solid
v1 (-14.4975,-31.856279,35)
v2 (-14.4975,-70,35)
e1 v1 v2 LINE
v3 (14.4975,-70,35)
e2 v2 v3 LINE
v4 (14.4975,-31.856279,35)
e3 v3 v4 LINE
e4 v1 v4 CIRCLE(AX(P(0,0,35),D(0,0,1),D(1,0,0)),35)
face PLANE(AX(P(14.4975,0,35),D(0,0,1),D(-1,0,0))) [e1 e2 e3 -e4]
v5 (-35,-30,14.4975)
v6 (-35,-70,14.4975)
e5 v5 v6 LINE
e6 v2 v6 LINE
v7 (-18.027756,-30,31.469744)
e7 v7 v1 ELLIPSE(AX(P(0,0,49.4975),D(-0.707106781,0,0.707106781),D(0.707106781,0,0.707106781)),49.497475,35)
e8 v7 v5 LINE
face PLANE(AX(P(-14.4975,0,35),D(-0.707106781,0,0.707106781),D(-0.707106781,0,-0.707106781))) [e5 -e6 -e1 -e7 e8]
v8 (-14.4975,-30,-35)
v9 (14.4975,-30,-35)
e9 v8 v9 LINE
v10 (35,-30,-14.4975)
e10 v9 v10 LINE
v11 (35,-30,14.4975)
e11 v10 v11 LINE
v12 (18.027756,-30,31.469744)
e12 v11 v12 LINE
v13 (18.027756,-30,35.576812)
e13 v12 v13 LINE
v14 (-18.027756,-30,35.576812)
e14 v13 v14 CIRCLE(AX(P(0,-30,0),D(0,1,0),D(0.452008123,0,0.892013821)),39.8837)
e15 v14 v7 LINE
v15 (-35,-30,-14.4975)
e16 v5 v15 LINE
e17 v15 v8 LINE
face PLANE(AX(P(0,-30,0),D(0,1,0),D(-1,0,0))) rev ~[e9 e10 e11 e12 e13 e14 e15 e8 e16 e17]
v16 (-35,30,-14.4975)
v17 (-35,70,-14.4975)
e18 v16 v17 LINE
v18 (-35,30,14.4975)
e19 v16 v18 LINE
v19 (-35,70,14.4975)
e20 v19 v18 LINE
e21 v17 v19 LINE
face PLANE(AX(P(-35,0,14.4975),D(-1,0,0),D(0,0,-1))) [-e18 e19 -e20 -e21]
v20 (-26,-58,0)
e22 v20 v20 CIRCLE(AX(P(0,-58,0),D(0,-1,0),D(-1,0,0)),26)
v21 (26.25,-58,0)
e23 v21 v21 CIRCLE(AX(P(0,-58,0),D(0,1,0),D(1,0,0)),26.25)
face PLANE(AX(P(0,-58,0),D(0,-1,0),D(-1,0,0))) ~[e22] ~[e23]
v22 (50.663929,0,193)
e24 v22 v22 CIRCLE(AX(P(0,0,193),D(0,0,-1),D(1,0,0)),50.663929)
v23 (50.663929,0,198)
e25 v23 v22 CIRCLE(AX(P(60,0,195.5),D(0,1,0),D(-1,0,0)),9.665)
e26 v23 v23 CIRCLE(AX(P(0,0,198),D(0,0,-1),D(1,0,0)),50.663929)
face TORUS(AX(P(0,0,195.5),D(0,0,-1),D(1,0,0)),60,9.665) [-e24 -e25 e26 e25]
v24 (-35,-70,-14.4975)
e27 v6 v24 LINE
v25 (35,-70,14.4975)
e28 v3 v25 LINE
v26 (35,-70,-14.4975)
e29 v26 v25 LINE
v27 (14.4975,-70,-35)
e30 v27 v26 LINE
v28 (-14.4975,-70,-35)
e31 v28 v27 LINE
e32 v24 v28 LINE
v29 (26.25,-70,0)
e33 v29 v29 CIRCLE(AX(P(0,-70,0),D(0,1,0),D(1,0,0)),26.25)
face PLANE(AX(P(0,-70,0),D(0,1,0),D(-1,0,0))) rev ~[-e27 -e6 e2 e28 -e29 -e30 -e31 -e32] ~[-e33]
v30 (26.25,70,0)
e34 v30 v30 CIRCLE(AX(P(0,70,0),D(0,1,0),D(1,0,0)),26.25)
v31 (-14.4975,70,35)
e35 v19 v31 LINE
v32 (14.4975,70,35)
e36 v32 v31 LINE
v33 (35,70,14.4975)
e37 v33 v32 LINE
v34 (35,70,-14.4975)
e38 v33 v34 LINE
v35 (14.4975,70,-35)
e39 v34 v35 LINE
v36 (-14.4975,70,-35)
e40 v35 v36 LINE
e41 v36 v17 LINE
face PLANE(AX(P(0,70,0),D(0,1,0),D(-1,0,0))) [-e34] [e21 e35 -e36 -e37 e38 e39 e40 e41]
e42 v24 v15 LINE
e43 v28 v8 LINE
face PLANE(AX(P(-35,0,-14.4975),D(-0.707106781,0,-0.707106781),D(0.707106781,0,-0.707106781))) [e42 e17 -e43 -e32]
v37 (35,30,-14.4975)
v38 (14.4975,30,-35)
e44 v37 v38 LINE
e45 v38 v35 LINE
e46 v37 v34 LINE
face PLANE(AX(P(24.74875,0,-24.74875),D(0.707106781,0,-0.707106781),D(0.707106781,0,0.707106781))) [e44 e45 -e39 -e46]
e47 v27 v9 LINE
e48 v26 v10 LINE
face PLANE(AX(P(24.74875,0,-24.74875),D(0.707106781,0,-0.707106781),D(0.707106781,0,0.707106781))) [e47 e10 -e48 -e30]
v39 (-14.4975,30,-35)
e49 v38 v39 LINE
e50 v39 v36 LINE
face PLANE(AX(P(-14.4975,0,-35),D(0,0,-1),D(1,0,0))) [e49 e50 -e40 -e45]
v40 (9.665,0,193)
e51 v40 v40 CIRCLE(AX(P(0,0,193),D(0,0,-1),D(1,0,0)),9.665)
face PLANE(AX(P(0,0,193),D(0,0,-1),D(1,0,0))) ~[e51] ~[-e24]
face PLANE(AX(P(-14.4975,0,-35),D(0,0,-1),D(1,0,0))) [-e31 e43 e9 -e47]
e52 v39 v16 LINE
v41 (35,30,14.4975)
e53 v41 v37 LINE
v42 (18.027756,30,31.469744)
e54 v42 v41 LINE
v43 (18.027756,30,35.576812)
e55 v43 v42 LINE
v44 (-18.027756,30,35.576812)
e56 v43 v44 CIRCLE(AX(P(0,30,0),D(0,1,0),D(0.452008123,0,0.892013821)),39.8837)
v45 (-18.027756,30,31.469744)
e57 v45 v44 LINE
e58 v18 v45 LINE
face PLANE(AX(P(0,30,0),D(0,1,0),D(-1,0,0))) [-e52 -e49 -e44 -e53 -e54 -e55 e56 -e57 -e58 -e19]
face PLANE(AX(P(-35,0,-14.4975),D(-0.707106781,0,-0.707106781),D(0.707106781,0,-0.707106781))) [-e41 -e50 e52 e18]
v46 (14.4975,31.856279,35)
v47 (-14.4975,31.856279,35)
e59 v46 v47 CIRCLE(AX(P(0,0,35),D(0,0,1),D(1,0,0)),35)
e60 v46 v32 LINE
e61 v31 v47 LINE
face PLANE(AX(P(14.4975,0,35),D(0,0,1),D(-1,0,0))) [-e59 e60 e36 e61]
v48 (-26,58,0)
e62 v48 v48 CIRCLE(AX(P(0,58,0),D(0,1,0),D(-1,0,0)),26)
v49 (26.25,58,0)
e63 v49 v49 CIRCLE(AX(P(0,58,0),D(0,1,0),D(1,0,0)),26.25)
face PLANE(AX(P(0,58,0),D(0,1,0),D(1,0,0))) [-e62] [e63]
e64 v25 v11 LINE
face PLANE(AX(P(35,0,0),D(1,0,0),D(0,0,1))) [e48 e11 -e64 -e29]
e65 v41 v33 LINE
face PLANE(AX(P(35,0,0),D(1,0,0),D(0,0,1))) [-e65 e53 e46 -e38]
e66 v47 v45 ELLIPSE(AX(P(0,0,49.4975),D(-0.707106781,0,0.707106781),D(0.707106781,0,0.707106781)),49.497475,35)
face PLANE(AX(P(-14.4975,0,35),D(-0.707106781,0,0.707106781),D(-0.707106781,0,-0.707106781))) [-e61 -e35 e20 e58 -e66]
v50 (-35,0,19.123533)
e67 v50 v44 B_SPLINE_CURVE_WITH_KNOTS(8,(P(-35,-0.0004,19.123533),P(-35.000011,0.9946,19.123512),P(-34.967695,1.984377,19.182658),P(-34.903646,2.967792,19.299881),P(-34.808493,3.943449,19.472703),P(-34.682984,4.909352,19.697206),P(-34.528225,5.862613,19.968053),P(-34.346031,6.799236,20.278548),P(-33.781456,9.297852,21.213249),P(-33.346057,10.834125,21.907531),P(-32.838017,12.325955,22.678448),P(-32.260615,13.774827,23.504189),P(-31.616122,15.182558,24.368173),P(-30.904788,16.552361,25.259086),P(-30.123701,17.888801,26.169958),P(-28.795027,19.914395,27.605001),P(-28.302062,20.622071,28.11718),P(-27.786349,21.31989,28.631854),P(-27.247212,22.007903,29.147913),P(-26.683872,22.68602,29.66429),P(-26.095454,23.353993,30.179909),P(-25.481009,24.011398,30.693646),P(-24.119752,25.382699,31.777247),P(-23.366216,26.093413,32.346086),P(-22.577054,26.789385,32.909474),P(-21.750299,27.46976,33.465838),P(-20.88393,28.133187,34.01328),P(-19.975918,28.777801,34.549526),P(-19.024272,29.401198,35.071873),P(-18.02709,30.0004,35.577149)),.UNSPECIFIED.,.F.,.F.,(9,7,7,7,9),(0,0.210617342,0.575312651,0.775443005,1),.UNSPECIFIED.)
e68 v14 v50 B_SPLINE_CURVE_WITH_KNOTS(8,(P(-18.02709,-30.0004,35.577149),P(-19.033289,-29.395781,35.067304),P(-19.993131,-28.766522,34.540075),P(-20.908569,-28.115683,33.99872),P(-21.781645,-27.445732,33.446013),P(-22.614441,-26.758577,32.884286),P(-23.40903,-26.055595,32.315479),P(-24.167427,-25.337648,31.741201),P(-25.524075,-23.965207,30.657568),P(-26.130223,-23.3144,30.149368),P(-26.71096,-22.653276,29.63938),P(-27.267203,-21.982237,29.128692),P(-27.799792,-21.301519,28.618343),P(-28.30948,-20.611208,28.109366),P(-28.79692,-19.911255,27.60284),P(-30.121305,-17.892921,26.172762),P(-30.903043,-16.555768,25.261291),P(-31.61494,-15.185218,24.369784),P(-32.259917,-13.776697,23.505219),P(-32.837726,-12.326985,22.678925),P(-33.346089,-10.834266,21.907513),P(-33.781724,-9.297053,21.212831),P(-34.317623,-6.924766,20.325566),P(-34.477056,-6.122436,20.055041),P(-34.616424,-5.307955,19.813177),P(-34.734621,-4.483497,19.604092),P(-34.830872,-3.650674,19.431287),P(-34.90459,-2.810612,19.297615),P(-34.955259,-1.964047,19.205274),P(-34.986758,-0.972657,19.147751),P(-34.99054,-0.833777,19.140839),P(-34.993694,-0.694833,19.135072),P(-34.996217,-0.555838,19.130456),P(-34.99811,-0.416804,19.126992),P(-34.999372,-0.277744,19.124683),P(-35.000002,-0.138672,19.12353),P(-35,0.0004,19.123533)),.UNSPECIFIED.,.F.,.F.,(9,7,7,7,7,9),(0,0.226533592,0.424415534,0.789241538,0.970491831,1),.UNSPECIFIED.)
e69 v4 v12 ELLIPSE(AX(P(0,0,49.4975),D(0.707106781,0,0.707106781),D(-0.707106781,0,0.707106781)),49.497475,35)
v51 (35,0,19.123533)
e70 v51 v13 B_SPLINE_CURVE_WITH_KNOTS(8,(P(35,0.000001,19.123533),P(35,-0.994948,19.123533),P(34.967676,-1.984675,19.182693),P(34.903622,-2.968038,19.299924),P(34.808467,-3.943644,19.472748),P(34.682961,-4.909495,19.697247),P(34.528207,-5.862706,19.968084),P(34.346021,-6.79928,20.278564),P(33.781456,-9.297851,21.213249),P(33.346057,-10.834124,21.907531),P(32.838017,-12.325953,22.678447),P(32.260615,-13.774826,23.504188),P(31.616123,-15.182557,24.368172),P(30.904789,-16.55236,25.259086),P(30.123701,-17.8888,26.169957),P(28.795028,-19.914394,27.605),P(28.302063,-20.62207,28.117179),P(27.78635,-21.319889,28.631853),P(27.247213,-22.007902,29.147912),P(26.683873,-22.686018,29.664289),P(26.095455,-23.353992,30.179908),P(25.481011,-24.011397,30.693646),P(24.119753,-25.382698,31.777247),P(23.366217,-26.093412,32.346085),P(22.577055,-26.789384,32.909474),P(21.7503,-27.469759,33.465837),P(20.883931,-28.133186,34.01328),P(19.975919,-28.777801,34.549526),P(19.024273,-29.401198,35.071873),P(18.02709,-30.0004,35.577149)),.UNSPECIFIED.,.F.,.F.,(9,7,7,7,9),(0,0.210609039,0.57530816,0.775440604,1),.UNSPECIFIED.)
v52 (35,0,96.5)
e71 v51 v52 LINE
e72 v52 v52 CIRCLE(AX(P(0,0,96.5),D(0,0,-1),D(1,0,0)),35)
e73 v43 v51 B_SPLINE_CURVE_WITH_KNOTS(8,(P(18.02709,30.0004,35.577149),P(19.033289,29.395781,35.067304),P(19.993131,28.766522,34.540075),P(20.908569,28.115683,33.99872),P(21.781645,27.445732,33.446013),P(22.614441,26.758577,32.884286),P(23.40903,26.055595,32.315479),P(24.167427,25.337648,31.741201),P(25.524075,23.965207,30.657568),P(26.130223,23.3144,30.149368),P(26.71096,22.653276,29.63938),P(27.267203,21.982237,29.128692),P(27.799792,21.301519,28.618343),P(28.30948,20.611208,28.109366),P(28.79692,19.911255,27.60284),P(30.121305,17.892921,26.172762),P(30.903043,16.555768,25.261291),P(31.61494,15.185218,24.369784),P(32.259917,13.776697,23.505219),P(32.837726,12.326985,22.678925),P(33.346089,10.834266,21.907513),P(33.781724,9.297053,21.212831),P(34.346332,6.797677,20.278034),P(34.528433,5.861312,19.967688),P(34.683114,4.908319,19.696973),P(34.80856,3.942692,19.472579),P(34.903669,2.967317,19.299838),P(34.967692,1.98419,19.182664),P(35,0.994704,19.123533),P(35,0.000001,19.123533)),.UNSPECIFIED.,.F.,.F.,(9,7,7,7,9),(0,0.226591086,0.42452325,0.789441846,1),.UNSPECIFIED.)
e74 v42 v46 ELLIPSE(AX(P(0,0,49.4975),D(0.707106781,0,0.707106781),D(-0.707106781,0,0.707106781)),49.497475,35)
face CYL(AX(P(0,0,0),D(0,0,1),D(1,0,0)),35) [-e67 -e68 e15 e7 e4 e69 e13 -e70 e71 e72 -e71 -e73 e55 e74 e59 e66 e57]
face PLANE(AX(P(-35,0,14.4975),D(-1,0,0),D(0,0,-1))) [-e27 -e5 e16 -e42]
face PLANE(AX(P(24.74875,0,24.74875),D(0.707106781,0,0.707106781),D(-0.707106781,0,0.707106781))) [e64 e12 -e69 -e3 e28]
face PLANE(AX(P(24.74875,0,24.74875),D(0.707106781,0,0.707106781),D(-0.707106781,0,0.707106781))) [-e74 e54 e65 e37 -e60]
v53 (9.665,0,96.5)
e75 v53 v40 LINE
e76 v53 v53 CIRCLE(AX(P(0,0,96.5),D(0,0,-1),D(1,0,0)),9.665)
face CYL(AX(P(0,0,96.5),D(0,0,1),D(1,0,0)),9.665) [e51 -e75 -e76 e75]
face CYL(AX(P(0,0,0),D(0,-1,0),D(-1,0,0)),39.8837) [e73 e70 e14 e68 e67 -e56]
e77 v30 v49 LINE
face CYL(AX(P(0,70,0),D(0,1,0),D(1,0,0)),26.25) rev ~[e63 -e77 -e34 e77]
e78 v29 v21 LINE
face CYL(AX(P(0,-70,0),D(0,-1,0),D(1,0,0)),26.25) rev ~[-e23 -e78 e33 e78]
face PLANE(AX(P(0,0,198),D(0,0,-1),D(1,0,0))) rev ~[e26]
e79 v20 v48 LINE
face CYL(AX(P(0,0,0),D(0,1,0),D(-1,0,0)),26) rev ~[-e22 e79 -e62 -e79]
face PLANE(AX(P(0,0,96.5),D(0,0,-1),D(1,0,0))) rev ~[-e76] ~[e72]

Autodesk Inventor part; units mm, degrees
ref_plane "YZ Plane" through (0, 0, 0) normal (1, 0, 0) x (0, 1, 0)
ref_plane "XZ Plane" through (0, 0, 0) normal (0, 1, 0) x (-1, 0, 0)
ref_plane "XY Plane" through (0, 0, 0) normal (0, 0, 1) x (1, 0, 0)
sketch "Sketch3" plane through (0, 0, 0) normal (0, 1, 0) x (-1, 0, 0)
  line L0 (-14.4975, 35) -> (14.4975, 35)
  line L1 (14.4975, 35) -> (35, 14.4975)
  line L2 (35, 14.4975) -> (35, -14.4975)
  line L3 (35, -14.4975) -> (14.4975, -35)
  line L4 (14.4975, -35) -> (-14.4975, -35)
  line L5 (-14.4975, -35) -> (-35, -14.4975)
  line L6 (-35, -14.4975) -> (-35, 14.4975)
  line L7 (-35, 14.4975) -> (-14.4975, 35)
  circle A0 centre (0, 0) radius 37.8837
  circle A1 centre (0, 0) radius 35
  circle A2 centre (0, 0) radius 26
  circle A3 centre (0, 0) radius 39.8837
  line L8 (0, 0) -> (-35, 0)
  line L9 (-35, 0) -> (-35, 96.5)
  line L10 (-35, 96.5) -> (0, 96.5)
  line L11 (0, 96.5) -> (0, 0)
  line L12 (0, 96.5) -> (-9.665, 96.5)
  line L13 (-9.665, 96.5) -> (-9.665, 193)
  line L14 (-9.665, 193) -> (0, 193)
  line L15 (0, 193) -> (0, 96.5)
  line L16 (0, 193) -> (-60, 193)
  line L17 (-60, 193) -> (-60, 198)
  line L18 (-60, 198) -> (0, 198)
  line L19 (0, 198) -> (0, 193)
  circle A4 centre (-60, 195.5) radius 9.665
  dimension "oSW" = 70
  dimension "oIntDia" = 52
  dimension "d16" = 2
  dimension "oWheelDia" = 120
  dimension "d51" = 5
  dimension "d52" = 19.33
  dimension "oStemHeight" = 198
  dimension "d57" = 19.33
  dimension "d58" = 28.9949
revolve "Revolution1" add sketch "Sketch3" angle 360 about axis through (0, 0, 193) along (0, 0, -1) picked at (-8.1008, 35.5309) picked at (-33.833, 18.2227) picked at (-2.2761, 31.7758) picked at (-17.116, 1.9285) contours A0 L11 L0 | L0 A1 L7 | L7 A0 | A0 L9 A3 L11 | L11 A2 L8 A1 | A1 L6 L7 | L11 L8 A2 | L9 L10 L11 A3 | L10 L13 L14 L15 | L14 L16 A4 L18 L19 | A4 L18 L17 L16 | L16 L17 L18 A4
extrude "Extrusion1" add sketch "Sketch3" along normal mid plane 140 separate body contours L0 A1 L7 | L0 L1 A1 | L11 A2 L8 A1 | A1 L8 A2 L11 | A1 L6 L7 | L1 L2 A1 | A1 L5 L6 | L2 L3 A1 | A1 L4 L5 | L3 L4 A1
extrude "Extrusion12" cut sketch "Sketch3" along normal through all both and the other way through all contours L11 L8 A2 | A2 L8 L11
extrude "Extrusion2" add sketch "Sketch3" along normal mid plane 60 contours A0 L11 L0 | L7 A0 | A0 L9 A3 L11 | L11 A0 L0 | L6 A0 | A0 L11 A3 L9 | A0 L1 | L5 A0 | A0 L2 | L4 A0 | A0 L3
sketch "Sketch10" plane through (0, 70, 0) normal (0, 1, 0) x (1, 0, 0)
  circle A0 centre (0, 0) radius 26 projected
  circle A1 centre (0, 0) radius 26.25
  dimension "d44" = 0.25
extrude "Extrusion11" cut sketch "Sketch10" against normal blind 12
mirror "Mirror1" about plane through (0, 0, 0) normal (0, 1, 0) of "Extrusion11"
equation "\"d52\" = 0.666667 * d58"
equation "\"d57\" = d52"
properties part number "Manual Threaded Globe Valve DN50 S235" material "S235"
